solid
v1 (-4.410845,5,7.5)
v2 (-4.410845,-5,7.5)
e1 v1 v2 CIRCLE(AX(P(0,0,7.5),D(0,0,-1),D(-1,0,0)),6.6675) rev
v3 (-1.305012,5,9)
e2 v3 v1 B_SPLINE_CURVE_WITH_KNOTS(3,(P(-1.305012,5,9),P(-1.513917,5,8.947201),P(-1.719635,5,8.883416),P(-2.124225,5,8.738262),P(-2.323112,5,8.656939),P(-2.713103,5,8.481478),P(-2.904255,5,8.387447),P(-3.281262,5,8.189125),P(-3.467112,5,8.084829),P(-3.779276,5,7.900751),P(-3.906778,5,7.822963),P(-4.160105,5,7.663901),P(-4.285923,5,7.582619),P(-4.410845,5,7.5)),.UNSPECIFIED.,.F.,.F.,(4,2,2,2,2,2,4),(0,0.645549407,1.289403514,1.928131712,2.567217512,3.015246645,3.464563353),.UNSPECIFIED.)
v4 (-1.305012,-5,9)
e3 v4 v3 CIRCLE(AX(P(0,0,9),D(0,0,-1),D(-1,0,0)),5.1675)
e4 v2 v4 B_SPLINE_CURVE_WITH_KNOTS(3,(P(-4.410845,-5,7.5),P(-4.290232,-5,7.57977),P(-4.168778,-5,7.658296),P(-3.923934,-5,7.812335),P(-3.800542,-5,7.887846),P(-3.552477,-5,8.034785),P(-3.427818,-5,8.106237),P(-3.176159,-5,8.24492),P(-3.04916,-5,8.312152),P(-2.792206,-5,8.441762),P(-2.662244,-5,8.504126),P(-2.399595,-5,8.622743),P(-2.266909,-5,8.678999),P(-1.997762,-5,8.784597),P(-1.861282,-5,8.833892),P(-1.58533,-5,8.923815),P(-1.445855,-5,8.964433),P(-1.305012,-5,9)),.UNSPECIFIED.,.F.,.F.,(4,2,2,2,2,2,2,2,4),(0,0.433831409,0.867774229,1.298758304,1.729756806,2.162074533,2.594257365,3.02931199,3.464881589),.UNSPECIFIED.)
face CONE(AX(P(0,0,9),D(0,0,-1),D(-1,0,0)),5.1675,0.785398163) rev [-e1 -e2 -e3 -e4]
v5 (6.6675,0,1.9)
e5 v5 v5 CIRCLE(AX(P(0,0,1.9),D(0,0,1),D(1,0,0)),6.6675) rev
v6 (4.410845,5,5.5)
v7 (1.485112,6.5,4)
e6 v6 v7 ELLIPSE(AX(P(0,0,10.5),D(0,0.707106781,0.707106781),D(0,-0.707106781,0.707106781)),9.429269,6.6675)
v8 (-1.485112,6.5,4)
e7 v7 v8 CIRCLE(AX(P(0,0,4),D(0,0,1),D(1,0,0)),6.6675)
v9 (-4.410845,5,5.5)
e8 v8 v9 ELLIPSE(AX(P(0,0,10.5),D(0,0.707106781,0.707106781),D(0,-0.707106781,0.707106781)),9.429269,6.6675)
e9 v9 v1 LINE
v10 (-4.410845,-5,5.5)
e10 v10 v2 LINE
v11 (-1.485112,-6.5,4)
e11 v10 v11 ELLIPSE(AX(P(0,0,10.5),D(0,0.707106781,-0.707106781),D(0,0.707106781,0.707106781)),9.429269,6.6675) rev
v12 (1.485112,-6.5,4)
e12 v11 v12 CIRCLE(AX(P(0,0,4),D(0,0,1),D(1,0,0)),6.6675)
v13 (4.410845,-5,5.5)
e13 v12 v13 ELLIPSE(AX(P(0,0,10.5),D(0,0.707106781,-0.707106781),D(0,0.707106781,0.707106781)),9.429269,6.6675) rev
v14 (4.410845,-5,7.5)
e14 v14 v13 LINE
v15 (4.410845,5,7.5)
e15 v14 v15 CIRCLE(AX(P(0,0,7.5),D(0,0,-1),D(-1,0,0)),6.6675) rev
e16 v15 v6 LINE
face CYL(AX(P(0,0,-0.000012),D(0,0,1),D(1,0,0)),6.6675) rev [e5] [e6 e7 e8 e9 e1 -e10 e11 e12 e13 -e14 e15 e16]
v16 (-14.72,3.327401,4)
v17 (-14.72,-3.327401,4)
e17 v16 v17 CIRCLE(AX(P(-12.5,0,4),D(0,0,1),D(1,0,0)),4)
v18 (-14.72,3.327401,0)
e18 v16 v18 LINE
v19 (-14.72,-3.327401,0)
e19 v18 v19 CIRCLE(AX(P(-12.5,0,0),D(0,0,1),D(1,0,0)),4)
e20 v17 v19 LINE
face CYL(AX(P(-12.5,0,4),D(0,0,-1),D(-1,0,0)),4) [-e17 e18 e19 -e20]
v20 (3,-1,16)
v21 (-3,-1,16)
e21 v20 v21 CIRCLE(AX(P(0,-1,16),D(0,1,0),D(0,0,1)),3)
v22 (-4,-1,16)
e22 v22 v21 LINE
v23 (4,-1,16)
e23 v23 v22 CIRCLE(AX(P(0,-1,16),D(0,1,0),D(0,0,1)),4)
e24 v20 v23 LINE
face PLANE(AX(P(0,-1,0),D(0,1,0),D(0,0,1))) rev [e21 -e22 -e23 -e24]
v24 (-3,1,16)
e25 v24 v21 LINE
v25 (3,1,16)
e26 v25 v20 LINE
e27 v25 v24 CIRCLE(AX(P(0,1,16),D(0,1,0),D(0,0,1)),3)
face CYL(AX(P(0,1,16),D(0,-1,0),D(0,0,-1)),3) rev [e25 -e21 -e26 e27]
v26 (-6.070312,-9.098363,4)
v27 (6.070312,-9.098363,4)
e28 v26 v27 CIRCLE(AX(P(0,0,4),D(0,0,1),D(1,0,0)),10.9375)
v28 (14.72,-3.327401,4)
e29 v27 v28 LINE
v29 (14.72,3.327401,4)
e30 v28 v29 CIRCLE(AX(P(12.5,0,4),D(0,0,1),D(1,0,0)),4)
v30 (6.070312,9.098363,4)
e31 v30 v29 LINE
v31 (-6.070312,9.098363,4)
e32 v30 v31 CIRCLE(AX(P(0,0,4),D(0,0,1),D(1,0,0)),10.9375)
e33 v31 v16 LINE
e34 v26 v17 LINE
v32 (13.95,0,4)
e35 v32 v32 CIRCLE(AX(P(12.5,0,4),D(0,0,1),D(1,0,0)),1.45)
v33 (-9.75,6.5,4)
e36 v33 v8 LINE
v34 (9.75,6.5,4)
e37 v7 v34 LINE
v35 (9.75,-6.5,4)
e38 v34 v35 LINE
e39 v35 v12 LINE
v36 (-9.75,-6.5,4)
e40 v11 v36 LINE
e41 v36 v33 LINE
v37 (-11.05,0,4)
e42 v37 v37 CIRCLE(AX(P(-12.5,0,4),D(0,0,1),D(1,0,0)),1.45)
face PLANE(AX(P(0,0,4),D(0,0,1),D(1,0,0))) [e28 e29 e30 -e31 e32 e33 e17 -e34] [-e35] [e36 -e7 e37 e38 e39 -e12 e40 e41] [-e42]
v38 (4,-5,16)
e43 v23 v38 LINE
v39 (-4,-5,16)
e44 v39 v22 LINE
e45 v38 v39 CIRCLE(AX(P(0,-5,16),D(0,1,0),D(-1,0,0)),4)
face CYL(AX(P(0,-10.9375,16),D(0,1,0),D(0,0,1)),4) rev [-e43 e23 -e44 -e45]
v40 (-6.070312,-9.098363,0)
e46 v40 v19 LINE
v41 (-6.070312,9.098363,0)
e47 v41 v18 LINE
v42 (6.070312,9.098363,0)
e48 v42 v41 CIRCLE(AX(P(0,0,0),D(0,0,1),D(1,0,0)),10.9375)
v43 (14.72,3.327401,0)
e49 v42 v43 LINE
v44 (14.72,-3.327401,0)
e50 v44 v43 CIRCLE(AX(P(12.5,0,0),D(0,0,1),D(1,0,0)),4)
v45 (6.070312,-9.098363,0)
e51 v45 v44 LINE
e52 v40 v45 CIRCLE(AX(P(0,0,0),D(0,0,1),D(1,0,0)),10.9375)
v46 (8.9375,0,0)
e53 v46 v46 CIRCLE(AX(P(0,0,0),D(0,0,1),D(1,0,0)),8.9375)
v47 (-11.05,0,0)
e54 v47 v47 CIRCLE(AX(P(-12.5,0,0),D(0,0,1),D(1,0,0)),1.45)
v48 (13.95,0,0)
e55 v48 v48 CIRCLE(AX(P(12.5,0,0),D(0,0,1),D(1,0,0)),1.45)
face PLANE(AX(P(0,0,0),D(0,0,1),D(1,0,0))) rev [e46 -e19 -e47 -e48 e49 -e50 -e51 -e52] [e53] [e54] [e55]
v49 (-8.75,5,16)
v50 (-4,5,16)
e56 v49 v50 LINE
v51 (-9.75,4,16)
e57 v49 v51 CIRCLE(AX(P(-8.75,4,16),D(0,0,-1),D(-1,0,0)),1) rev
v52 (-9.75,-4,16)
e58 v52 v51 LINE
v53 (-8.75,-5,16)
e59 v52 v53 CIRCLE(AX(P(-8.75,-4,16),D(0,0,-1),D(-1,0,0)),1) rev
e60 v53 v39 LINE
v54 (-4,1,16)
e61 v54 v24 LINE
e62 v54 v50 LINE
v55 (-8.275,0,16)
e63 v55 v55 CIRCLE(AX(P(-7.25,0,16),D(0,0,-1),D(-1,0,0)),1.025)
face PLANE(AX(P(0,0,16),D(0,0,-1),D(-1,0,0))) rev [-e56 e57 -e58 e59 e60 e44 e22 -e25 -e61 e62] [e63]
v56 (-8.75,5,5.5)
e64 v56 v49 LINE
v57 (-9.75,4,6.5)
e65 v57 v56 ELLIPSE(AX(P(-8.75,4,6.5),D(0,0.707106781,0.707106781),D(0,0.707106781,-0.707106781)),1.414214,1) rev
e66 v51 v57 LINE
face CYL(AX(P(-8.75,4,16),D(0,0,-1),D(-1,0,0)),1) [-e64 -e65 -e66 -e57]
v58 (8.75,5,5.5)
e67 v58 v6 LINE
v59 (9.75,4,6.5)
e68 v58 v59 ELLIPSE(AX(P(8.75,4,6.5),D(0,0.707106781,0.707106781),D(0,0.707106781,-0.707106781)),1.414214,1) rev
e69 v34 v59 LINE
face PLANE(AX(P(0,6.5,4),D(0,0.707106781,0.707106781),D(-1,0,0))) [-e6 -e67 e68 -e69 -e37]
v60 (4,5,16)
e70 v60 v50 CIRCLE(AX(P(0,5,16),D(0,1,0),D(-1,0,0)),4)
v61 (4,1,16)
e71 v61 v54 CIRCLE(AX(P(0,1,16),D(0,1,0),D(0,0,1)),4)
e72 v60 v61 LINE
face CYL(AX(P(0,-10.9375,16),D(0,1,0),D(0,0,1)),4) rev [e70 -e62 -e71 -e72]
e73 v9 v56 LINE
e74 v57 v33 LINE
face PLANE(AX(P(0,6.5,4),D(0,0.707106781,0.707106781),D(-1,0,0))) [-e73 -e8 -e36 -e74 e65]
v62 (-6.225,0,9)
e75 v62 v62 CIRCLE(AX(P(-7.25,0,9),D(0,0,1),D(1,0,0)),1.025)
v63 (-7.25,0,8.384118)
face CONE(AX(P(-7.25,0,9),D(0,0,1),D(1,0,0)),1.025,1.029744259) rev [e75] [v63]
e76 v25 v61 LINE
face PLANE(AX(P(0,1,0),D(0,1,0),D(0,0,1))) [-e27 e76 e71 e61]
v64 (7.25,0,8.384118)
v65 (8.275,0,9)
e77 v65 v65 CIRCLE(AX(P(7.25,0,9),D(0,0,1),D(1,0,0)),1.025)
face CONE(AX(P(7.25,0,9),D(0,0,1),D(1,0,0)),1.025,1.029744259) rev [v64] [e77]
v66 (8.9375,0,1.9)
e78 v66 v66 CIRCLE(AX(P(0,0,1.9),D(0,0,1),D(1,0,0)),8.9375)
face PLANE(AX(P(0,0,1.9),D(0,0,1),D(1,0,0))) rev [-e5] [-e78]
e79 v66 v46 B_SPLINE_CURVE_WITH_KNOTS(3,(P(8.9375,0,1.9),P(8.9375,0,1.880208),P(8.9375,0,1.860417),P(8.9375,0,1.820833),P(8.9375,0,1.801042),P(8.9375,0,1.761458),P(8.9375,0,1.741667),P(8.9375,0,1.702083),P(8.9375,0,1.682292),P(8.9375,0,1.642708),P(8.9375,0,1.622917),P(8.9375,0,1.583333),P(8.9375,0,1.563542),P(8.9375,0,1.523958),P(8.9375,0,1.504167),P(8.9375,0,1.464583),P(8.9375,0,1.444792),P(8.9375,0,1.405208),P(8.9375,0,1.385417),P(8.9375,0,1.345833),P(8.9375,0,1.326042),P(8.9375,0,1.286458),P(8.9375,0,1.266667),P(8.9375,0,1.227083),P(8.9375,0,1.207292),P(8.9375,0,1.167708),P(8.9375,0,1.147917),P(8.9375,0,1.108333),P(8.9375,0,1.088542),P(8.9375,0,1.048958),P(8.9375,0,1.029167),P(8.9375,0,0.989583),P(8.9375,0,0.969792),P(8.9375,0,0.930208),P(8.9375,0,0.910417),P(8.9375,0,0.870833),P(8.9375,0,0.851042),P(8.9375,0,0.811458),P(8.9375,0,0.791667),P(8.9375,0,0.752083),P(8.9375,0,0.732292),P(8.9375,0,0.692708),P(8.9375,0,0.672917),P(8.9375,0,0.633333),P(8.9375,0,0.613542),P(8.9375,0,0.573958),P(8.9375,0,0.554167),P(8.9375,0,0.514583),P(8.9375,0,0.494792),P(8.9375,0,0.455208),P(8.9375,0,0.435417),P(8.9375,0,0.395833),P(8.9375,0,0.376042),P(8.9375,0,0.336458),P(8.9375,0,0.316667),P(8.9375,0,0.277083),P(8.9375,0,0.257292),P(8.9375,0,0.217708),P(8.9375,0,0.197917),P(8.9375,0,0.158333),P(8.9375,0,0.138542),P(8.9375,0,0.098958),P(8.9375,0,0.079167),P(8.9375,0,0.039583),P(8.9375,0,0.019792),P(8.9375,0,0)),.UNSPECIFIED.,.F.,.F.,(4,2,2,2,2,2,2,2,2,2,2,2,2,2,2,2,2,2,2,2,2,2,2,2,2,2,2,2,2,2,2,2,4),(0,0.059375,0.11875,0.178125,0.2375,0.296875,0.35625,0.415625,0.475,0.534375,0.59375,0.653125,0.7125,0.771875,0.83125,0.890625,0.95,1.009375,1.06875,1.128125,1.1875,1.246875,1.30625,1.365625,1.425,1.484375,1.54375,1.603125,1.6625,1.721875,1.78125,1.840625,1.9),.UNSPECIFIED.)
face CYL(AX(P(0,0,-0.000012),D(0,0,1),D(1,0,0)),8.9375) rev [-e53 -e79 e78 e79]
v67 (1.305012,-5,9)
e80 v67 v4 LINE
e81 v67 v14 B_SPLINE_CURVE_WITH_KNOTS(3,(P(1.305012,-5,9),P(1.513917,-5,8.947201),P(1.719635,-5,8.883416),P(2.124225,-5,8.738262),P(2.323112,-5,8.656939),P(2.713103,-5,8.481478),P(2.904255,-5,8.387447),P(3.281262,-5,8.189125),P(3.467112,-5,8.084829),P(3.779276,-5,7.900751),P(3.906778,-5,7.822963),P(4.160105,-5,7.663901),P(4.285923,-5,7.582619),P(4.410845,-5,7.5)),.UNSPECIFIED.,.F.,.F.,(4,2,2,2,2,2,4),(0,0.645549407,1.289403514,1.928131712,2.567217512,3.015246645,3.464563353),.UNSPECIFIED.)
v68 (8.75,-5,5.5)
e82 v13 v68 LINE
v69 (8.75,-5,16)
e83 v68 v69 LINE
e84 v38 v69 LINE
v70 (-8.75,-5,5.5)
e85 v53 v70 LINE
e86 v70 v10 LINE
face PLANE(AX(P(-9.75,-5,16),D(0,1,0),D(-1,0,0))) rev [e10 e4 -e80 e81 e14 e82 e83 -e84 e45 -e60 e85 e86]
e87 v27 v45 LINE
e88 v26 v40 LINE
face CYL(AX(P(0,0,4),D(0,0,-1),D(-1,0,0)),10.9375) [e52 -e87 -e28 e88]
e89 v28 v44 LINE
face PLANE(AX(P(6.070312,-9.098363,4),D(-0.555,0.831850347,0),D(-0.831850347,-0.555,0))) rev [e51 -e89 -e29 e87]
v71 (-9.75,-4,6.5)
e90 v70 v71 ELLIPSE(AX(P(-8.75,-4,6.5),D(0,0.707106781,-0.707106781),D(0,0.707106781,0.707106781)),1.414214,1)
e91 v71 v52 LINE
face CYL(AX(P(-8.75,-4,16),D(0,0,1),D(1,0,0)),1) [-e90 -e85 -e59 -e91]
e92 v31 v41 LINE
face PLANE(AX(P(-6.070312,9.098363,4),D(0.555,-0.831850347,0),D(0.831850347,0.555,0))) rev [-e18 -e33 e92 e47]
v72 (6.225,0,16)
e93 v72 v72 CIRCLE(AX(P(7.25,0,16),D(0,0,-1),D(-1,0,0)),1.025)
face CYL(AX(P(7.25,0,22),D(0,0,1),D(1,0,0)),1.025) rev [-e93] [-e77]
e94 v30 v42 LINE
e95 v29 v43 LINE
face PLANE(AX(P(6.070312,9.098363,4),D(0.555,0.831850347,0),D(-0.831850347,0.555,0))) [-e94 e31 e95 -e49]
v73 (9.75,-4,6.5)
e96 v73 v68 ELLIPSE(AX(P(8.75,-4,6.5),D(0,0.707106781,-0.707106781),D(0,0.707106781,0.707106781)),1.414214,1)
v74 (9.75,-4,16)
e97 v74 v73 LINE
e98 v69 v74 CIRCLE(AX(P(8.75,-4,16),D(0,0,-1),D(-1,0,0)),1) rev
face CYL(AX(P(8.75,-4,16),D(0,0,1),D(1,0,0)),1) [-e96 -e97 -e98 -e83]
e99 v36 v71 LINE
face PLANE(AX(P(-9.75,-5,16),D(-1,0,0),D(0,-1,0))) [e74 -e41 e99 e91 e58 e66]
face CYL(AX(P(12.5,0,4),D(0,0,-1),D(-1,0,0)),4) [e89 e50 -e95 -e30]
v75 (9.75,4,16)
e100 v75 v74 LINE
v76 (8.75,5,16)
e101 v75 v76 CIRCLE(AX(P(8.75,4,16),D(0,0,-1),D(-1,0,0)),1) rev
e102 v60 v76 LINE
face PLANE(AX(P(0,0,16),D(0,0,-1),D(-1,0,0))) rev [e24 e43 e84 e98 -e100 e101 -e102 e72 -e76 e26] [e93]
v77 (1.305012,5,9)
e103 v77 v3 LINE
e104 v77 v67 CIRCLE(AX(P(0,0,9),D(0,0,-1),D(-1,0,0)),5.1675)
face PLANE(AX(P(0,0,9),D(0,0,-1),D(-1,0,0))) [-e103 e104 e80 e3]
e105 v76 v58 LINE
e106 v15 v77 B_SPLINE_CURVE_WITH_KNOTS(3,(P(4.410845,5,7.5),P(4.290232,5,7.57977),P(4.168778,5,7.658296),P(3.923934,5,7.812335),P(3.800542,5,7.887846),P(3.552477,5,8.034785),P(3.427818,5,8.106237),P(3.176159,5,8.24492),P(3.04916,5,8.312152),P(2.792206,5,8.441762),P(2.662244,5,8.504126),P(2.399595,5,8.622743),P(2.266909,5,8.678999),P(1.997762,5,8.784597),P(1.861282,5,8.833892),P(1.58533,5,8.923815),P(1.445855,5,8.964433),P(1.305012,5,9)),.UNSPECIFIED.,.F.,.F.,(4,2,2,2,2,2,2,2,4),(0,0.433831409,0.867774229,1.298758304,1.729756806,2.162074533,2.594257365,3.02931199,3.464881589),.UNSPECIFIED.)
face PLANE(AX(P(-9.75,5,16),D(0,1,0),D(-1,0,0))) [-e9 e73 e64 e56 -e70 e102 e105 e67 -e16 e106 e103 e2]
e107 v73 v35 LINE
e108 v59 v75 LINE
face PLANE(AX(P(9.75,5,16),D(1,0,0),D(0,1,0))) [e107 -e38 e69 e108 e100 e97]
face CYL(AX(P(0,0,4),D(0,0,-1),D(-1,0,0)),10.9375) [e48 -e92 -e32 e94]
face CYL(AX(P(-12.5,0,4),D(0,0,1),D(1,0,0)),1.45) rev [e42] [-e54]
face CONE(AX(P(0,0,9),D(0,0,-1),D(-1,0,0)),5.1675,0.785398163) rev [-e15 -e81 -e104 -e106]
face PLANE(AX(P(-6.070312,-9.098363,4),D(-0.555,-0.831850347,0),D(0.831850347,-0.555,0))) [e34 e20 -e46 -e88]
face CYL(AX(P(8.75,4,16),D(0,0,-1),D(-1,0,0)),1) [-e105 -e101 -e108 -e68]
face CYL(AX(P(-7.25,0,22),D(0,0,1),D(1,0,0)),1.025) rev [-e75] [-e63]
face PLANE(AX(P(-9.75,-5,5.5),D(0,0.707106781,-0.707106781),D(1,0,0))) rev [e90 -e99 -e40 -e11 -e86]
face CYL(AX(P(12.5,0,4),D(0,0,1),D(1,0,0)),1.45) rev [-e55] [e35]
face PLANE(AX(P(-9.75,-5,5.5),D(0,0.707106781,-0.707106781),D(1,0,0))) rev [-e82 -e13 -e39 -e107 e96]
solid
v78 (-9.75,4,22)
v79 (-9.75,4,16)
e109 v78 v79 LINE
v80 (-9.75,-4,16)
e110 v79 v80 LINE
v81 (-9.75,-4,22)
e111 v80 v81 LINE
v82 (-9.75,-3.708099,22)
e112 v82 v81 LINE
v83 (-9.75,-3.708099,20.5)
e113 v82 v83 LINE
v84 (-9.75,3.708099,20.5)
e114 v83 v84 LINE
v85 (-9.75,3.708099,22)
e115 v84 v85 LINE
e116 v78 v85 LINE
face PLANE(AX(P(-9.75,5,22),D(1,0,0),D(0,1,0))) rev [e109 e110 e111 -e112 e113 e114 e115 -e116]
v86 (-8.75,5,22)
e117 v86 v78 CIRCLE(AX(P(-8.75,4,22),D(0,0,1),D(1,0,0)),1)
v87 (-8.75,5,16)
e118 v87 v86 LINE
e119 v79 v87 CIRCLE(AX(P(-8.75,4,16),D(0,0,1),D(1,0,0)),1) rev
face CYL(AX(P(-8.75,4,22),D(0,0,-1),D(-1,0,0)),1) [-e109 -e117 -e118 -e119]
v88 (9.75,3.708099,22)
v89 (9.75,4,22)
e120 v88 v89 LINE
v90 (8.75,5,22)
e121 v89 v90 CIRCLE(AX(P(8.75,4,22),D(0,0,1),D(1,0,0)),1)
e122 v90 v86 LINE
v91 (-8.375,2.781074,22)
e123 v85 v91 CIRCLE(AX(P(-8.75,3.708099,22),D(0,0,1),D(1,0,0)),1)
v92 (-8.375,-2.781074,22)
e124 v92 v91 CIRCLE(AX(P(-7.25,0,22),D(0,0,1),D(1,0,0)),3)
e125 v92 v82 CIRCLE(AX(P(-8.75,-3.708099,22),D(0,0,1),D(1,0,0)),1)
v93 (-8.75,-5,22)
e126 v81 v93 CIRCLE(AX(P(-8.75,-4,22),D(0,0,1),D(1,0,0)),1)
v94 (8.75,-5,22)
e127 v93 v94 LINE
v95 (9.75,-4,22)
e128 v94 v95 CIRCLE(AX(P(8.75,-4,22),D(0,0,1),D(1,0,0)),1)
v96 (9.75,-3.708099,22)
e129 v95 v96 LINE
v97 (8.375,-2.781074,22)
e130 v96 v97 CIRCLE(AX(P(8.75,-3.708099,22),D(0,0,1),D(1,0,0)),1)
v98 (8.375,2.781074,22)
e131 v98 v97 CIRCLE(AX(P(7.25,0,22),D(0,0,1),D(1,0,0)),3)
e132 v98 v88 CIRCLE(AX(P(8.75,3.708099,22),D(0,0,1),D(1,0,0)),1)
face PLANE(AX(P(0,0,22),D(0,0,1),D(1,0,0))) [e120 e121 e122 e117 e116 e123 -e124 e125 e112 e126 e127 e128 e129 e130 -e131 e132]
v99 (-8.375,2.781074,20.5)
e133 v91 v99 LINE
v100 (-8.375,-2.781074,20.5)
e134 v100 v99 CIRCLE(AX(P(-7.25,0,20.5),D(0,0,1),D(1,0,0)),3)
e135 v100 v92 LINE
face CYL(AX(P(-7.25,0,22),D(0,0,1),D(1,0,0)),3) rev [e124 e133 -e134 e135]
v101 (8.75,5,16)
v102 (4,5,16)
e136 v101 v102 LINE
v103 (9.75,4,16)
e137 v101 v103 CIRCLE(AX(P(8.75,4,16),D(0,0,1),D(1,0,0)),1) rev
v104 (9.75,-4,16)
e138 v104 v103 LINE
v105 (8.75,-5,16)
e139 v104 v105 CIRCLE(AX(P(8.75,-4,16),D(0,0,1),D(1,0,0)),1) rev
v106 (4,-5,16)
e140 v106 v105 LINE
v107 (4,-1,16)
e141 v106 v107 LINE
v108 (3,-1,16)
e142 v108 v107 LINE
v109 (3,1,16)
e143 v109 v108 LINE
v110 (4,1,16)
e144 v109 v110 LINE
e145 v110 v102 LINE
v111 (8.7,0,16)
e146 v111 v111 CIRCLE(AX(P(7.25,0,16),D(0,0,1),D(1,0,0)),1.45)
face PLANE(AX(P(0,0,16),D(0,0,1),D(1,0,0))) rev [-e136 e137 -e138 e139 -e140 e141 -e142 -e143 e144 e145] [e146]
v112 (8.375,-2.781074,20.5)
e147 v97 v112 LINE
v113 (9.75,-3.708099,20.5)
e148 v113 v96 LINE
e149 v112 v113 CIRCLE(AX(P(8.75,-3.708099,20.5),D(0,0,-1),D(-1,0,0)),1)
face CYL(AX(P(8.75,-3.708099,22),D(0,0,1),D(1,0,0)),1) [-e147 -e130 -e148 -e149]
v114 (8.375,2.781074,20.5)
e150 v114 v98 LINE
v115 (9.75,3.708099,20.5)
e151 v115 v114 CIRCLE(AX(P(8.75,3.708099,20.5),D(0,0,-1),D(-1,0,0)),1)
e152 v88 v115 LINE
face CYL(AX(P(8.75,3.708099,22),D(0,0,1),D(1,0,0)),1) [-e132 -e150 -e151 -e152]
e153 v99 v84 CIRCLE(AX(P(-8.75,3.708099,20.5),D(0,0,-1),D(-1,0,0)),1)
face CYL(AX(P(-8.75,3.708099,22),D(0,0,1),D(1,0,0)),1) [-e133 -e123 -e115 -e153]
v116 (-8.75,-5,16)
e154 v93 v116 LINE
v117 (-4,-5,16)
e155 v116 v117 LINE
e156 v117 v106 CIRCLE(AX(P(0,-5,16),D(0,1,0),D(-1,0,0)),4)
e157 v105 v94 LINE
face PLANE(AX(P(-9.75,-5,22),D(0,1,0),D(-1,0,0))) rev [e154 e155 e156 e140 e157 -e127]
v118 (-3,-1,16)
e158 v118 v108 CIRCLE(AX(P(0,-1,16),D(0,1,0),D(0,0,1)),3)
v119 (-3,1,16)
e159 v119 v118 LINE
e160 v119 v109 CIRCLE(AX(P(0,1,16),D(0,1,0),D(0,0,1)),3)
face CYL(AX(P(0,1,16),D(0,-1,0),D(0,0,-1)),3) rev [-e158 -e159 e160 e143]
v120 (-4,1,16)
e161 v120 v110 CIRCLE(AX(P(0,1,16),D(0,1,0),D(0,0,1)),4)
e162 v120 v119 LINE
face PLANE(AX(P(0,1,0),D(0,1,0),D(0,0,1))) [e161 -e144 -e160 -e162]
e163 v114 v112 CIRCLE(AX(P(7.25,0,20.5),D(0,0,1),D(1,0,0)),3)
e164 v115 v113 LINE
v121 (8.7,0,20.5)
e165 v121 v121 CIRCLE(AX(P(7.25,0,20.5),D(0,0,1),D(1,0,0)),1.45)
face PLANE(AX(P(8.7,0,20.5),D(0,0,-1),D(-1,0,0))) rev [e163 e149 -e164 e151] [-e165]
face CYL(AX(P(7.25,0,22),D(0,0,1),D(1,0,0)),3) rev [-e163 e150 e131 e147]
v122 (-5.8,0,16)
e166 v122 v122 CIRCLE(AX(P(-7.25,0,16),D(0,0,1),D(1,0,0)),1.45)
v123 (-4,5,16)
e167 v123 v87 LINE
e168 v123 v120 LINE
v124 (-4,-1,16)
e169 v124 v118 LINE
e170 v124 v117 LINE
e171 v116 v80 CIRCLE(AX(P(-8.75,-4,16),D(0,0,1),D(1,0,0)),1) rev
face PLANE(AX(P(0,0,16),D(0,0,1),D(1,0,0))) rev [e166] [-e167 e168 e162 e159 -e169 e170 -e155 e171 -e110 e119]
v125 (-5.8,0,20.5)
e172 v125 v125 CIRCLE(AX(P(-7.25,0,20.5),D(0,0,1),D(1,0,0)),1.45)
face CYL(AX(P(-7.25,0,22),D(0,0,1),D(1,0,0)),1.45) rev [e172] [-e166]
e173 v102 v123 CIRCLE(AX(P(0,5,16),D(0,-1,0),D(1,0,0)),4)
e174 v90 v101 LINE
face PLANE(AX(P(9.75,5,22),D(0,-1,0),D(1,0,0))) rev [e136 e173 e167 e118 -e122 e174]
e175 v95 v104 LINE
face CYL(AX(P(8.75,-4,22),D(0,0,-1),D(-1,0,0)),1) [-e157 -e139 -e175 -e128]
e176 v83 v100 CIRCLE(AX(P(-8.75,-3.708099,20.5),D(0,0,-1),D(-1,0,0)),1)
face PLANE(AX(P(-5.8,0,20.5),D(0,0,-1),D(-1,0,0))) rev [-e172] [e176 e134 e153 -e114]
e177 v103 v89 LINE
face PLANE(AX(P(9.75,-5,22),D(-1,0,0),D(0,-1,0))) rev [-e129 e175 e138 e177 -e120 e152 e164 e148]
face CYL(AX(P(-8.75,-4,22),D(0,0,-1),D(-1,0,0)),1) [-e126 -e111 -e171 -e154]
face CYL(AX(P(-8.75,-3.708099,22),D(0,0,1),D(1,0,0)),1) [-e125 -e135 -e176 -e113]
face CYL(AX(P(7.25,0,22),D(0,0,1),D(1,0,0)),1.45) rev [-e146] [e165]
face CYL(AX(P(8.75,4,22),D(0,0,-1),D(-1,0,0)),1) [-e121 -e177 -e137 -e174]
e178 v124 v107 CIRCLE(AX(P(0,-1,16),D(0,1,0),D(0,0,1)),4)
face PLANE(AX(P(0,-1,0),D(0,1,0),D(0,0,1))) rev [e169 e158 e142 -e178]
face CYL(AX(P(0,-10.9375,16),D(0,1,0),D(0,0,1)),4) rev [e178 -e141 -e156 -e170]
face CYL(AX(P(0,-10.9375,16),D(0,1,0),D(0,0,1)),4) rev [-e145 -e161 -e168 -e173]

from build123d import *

# Parameters (mm, degrees)
BOSS_EXTRUDE1_DEPTH                            = 4
CUT_EXTRUDE1_DEPTH                             = 21.196012137
CUT_EXTRUDE1_DEPTH_BACK                        = 21.196012137
CUT_EXTRUDE2_DEPTH                             = 1.9
CUT_EXTRUDE2_DEPTH_BACK                        = 21.196012137
SKETCH1_6_R                                    = 8.9375
M2_5_CLEARANCE_HOLE1_D                         = 2.9
SKETCH4_W                                      = 19.5
SKETCH4_H                                      = 10
BOSS_EXTRUDE2_DEPTH                            = 12
SKETCH6_R                                      = 6.6675
CUT_EXTRUDE3_DEPTH                             = 5
SKETCH8_W                                      = 19.5
SKETCH8_H                                      = 10
BOSS_EXTRUDE3_DEPTH                            = 6
CUT_EXTRUDE4_DEPTH                             = 30.595251414
CUT_EXTRUDE4_DEPTH_BACK                        = 30.595251414
SKETCH9_R                                      = 4
BOSS_EXTRUDE4_DEPTH                            = 1
BOSS_EXTRUDE5_DEPTH                            = 1
CHAMFER2_SIZE                                  = 1.5
TAP_DRILL_FOR_M2_5X0_45_TAP1_AT_2_COUNT        = 2
TAP_DRILL_FOR_M2_5X0_45_TAP1_AT_2_PITCH        = 14.5
CBORE_FOR_M2_5_PAN_HEAD_MACHINE_SCREW1_A_COUNT = 2
CBORE_FOR_M2_5_PAN_HEAD_MACHINE_SCREW1_A_PITCH = 14.5
FILLET1_R                                      = 1
FILLET2_R                                      = 1


with BuildPart() as part:
    # Sketch1 → Boss-Extrude1 (new body)
    with BuildSketch(Plane.XY):
        with BuildLine():
            ThreePointArc((14.72, -3.327401388), (16.5, 0), (14.72, 3.327401388))
            Line((14.72, 3.327401388), (6.0703125, 9.098363172))
            ThreePointArc((6.0703125, 9.098363172), (0, 10.9375), (-6.0703125, 9.098363172))
            Line((-6.0703125, 9.098363172), (-14.72, 3.327401388))
            ThreePointArc((-14.72, 3.327401388), (-16.5, 0), (-14.72, -3.327401388))
            Line((-14.72, -3.327401388), (-6.0703125, -9.098363172))
            ThreePointArc((-6.0703125, -9.098363172), (0, -10.9375), (6.0703125, -9.098363172))
            Line((6.0703125, -9.098363172), (14.72, -3.327401388))
        make_face()
    extrude(amount=BOSS_EXTRUDE1_DEPTH)

    # Sketch1<4> → Cut-Extrude1 (cut, two sides: drawn at the far end of the back side and taken through both)
    with BuildSketch(Plane.XY.offset(-CUT_EXTRUDE1_DEPTH_BACK)):
        with BuildLine():
            ThreePointArc((-6.6675, 0), (0, -6.6675), (6.6675, 0))
            Line((6.6675, 0), (-6.6675, 0))
        make_face()
        with BuildLine():
            Line((-6.6675, 0), (6.6675, 0))
            ThreePointArc((6.6675, 0), (0, 6.6675), (-6.6675, 0))
        make_face()
    extrude(amount=CUT_EXTRUDE1_DEPTH + CUT_EXTRUDE1_DEPTH_BACK, mode=Mode.SUBTRACT)

    # Sketch1<6> → Cut-Extrude2 (cut, two sides: drawn at the far end of the back side and taken through both)
    with BuildSketch(Plane.XY.offset(-CUT_EXTRUDE2_DEPTH_BACK)):
        Circle(SKETCH1_6_R)
    extrude(amount=CUT_EXTRUDE2_DEPTH + CUT_EXTRUDE2_DEPTH_BACK, mode=Mode.SUBTRACT)

    # M2.5 Clearance Hole1 (through all)
    with Locations(Plane.XY.offset(4)):
        with Locations((-12.5, 0), (12.5, 0)):
            Hole(M2_5_CLEARANCE_HOLE1_D / 2)

    # Sketch4 → Boss-Extrude2 (add)
    with BuildSketch(Plane.XY.offset(4)):
        Rectangle(SKETCH4_W, SKETCH4_H)
    extrude(amount=BOSS_EXTRUDE2_DEPTH)

    # Sketch6 → Cut-Extrude3 (cut)
    with BuildSketch(Plane(origin=(0, 0, 4), x_dir=(-1, 0, 0), z_dir=(0, 0, -1))):
        with Locations(Location((0, 0, 0), (0, 0, 180))):
            Circle(SKETCH6_R)
    extrude(amount=-CUT_EXTRUDE3_DEPTH, mode=Mode.SUBTRACT)


with BuildPart() as body_2:
    # Sketch8 → Boss-Extrude3 (new body)
    with BuildSketch(Plane.XY.offset(16)):
        Rectangle(SKETCH8_W, SKETCH8_H)
    extrude(amount=BOSS_EXTRUDE3_DEPTH)


with BuildPart() as cut_extrude4_tool:
    # Sketch9 → Cut-Extrude4 (new, two sides: drawn at the far end of the back side and taken through both)
    with BuildSketch(Plane(origin=(0, 0, 0), x_dir=(1, 0, 0), z_dir=(0, 1, 0)).offset(-CUT_EXTRUDE4_DEPTH_BACK)):
        with Locations((0, -16)):
            Circle(SKETCH9_R)
    extrude(amount=CUT_EXTRUDE4_DEPTH + CUT_EXTRUDE4_DEPTH_BACK)


with BuildPart() as part_1:
    add(part.part)

    # Cut-Extrude4: cut by cut_extrude4_tool
    add(cut_extrude4_tool.part, mode=Mode.SUBTRACT)

    # Sketch9<3> → Boss-Extrude4 (add, symmetric)
    with BuildSketch(Plane(origin=(0, 0, 0), x_dir=(1, 0, 0), z_dir=(0, 1, 0))):
        with BuildLine():
            ThreePointArc((-3, -16), (0, -13), (3, -16))
            Line((3, -16), (4, -16))
            ThreePointArc((4, -16), (0, -12), (-4, -16))
            Line((-4, -16), (-3, -16))
        make_face()
    extrude(amount=BOSS_EXTRUDE4_DEPTH, both=True)

    # Chamfer2
    # the kernel refuses this chamfer: 1.5 mm, written as the material it adds along each edge
    with BuildSketch(Plane(origin=(9.75, -5, 4), x_dir=(0, -0.9996219169112969, -0.027495876610586497), z_dir=(-1, 0, 0))) as chamfer2_piece_1_section:
        Polygon((CHAMFER2_SIZE * 0.999621916911, CHAMFER2_SIZE * 0.0274958766106), (-CHAMFER2_SIZE * 0.0274958766106, CHAMFER2_SIZE * 0.999621916911), (0, 0), align=None)
    chamfer2_piece_1 = extrude(amount=9.196679183, mode=Mode.PRIVATE)
    chamfer2_piece_1 = chamfer2_piece_1 - Plane(origin=(0, 0, 4.474133211), x_dir=(-1, 0, 0), z_dir=(0, 0, -1)) * Cylinder(6.6675, 25, mode=Mode.PRIVATE)
    add(chamfer2_piece_1)
    with BuildSketch(Plane(origin=(0.553320817, 5, 4), x_dir=(0, 0.9996219169112969, -0.027495876610586497), z_dir=(1, 0, 0))) as chamfer2_piece_2_section:
        Polygon((CHAMFER2_SIZE * 0.999621916911, CHAMFER2_SIZE * 0.0274958766106), (-CHAMFER2_SIZE * 0.0274958766106, CHAMFER2_SIZE * 0.999621916911), (0, 0), align=None)
    chamfer2_piece_2 = extrude(amount=9.196679183, mode=Mode.PRIVATE)
    chamfer2_piece_2 = chamfer2_piece_2 - Plane(origin=(0, 0, 4.474133218), x_dir=(-1, 0, 0), z_dir=(0, 0, -1)) * Cylinder(6.6675, 25, mode=Mode.PRIVATE)
    add(chamfer2_piece_2)
    with BuildSketch(Plane(origin=(-9.75, 5, 4), x_dir=(0, 0.9996219169112969, -0.027495876610586497), z_dir=(1, 0, 0))) as chamfer2_piece_3_section:
        Polygon((CHAMFER2_SIZE * 0.999621916911, CHAMFER2_SIZE * 0.0274958766106), (-CHAMFER2_SIZE * 0.0274958766106, CHAMFER2_SIZE * 0.999621916911), (0, 0), align=None)
    chamfer2_piece_3 = extrude(amount=9.196679183, mode=Mode.PRIVATE)
    chamfer2_piece_3 = chamfer2_piece_3 - Plane(origin=(0, 0, 4.474133211), x_dir=(-1, 0, 0), z_dir=(0, 0, -1)) * Cylinder(6.6675, 25, mode=Mode.PRIVATE)
    add(chamfer2_piece_3)
    with BuildSketch(Plane(origin=(-0.553320817, -5, 4), x_dir=(0, -0.9996219169112969, -0.027495876610586497), z_dir=(-1, 0, 0))) as chamfer2_piece_4_section:
        Polygon((CHAMFER2_SIZE * 0.999621916911, CHAMFER2_SIZE * 0.0274958766106), (-CHAMFER2_SIZE * 0.0274958766106, CHAMFER2_SIZE * 0.999621916911), (0, 0), align=None)
    chamfer2_piece_4 = extrude(amount=9.196679183, mode=Mode.PRIVATE)
    chamfer2_piece_4 = chamfer2_piece_4 - Plane(origin=(0, 0, 4.474133218), x_dir=(-1, 0, 0), z_dir=(0, 0, -1)) * Cylinder(6.6675, 25, mode=Mode.PRIVATE)
    add(chamfer2_piece_4)
    with BuildSketch(Plane(origin=(0, 0, 9), x_dir=(1, 0, 0), z_dir=(0, 1, 0))) as chamfer2_piece_5_section:
        Polygon((6.6675 - CHAMFER2_SIZE, 0), (6.6675, CHAMFER2_SIZE), (6.6675, 0), align=None)
    chamfer2_piece_5 = revolve(axis=Axis((0, 0, 9), (0, 0, -1)), revolution_arc=81.734975252, mode=Mode.PRIVATE)
    chamfer2_piece_5 = split(chamfer2_piece_5, bisect_by=Plane(origin=(5.259793087, -5, 8.512416934), z_dir=(0, 1, 0)), keep=Keep.TOP, mode=Mode.PRIVATE)
    add(chamfer2_piece_5)
    with BuildSketch(Plane(origin=(0, 0, 9), x_dir=(-0.1435510514142993, -0.9896429131953854, 0), z_dir=(0.9896429131953854, -0.1435510514142993, 0))) as chamfer2_piece_6_section:
        Polygon((6.6675 - CHAMFER2_SIZE, 0), (6.6675, CHAMFER2_SIZE), (6.6675, 0), align=None)
    chamfer2_piece_6 = revolve(axis=Axis((0, 0, 9), (0, 0, -1)), revolution_arc=163.493234438, mode=Mode.PRIVATE)
    chamfer2_piece_6 = split(chamfer2_piece_6, bisect_by=Plane(origin=(-5.93475428, 5, 8.26725428), z_dir=(0, -1, 0)), keep=Keep.TOP, mode=Mode.PRIVATE)
    chamfer2_piece_6 = split(chamfer2_piece_6, bisect_by=Plane(origin=(-5.93475428, -5, 8.26725428), z_dir=(0, 1, 0)), keep=Keep.TOP, mode=Mode.PRIVATE)
    add(chamfer2_piece_6)
    with BuildSketch(Plane(origin=(0, 0, 9), x_dir=(0.14375213464834083, 0.9896137245329842, 0), z_dir=(-0.9896137245329842, 0.14375213464834083, 0))) as chamfer2_piece_7_section:
        Polygon((6.6675, CHAMFER2_SIZE), (6.6675 - CHAMFER2_SIZE, 0), (6.6675, 0), align=None)
    chamfer2_piece_7 = revolve(axis=Axis((0, 0, 9), (0, 0, -1)), revolution_arc=81.734975252, mode=Mode.PRIVATE)
    chamfer2_piece_7 = split(chamfer2_piece_7, bisect_by=Plane(origin=(5.259793397, 5, 8.512416854), z_dir=(0, -1, 0)), keep=Keep.TOP, mode=Mode.PRIVATE)
    add(chamfer2_piece_7)

    # Sketch12 → Tap Drill for M2.5x0.45 Tap1 (revolve, cut)
    with BuildSketch(Plane(origin=(-7.25, 0, 22), x_dir=(0, -1, 0), z_dir=(1, 0, 0))):
        Polygon((0, 0), (0, 13.615882135), (1.025, 13), (1.025, 0), align=None)
    tap_drill_for_m2_5x0_45_tap1 = revolve(axis=Axis((-7.25, 0, 28.35), (0, 0, -1)), mode=Mode.SUBTRACT)

    # Tap Drill for M2.5x0.45 Tap1 at 2: Tap Drill for M2.5x0.45 Tap1 ×2
    with Locations(*[(i * TAP_DRILL_FOR_M2_5X0_45_TAP1_AT_2_PITCH, 0, 0) for i in range(1, TAP_DRILL_FOR_M2_5X0_45_TAP1_AT_2_COUNT)]):
        add(tap_drill_for_m2_5x0_45_tap1, mode=Mode.SUBTRACT)

    # Fillet1
    # the kernel refuses this fillet: 1 mm, written as the material it takes off along each edge
    with BuildSketch(Plane(origin=(-9.75, 5, 3), x_dir=(1, 0, 0), z_dir=(0, 0, 1))) as fillet1_piece_1_section:
        with BuildLine():
            CenterArc((FILLET1_R, -FILLET1_R), FILLET1_R, 90, 90)
            Line((0, -FILLET1_R), (0, 0))
            Line((0, 0), (FILLET1_R, 0))
        make_face()
    fillet1_piece_1 = extrude(amount=15.5, mode=Mode.PRIVATE)
    fillet1_piece_1 = split(fillet1_piece_1, bisect_by=Plane(origin=(-9.521455398, 1.582932532, 8.917067468), z_dir=(0, 0.7071067811868302, 0.7071067811862648)), keep=Keep.TOP, mode=Mode.PRIVATE)
    add(fillet1_piece_1, mode=Mode.SUBTRACT)
    with BuildSketch(Plane(origin=(-9.75, -5, 3), x_dir=(1, 0, 0), z_dir=(0, 0, 1))) as fillet1_piece_2_section:
        with BuildLine():
            CenterArc((FILLET1_R, FILLET1_R), FILLET1_R, 180, 90)
            Line((0, FILLET1_R), (0, 0))
            Line((0, 0), (FILLET1_R, 0))
        make_face()
    fillet1_piece_2 = extrude(amount=15.5, mode=Mode.PRIVATE)
    fillet1_piece_2 = split(fillet1_piece_2, bisect_by=Plane(origin=(-9.521455398, -1.582932532, 8.917067468), z_dir=(0, -0.7071067811868302, 0.7071067811862648)), keep=Keep.TOP, mode=Mode.PRIVATE)
    add(fillet1_piece_2, mode=Mode.SUBTRACT)
    with BuildSketch(Plane(origin=(9.75, -5, 3), x_dir=(-1, 0, 0), z_dir=(0, 0, 1))) as fillet1_piece_3_section:
        with BuildLine():
            CenterArc((FILLET1_R, -FILLET1_R), FILLET1_R, 90, 90)
            Line((0, -FILLET1_R), (0, 0))
            Line((0, 0), (FILLET1_R, 0))
        make_face()
    fillet1_piece_3 = extrude(amount=15.5, mode=Mode.PRIVATE)
    fillet1_piece_3 = split(fillet1_piece_3, bisect_by=Plane(origin=(9.521455398, -1.582932532, 8.917067468), z_dir=(0, -0.7071067811868302, 0.7071067811862648)), keep=Keep.TOP, mode=Mode.PRIVATE)
    add(fillet1_piece_3, mode=Mode.SUBTRACT)
    with BuildSketch(Plane(origin=(9.75, 5, 3), x_dir=(-1, 0, 0), z_dir=(0, 0, 1))) as fillet1_piece_4_section:
        with BuildLine():
            CenterArc((FILLET1_R, FILLET1_R), FILLET1_R, 180, 90)
            Line((0, FILLET1_R), (0, 0))
            Line((0, 0), (FILLET1_R, 0))
        make_face()
    fillet1_piece_4 = extrude(amount=15.5, mode=Mode.PRIVATE)
    fillet1_piece_4 = split(fillet1_piece_4, bisect_by=Plane(origin=(9.521455398, 1.582932532, 8.917067468), z_dir=(0, 0.7071067811868302, 0.7071067811862648)), keep=Keep.TOP, mode=Mode.PRIVATE)
    add(fillet1_piece_4, mode=Mode.SUBTRACT)


with BuildPart() as body_2_1:
    add(body_2.part)

    # Cut-Extrude4: cut by cut_extrude4_tool
    add(cut_extrude4_tool.part, mode=Mode.SUBTRACT)

    # Sketch9<4> → Boss-Extrude5 (add, symmetric)
    with BuildSketch(Plane(origin=(0, 0, 0), x_dir=(1, 0, 0), z_dir=(0, 1, 0))):
        with BuildLine():
            Line((4, -16), (3, -16))
            ThreePointArc((3, -16), (0, -19), (-3, -16))
            Line((-3, -16), (-4, -16))
            ThreePointArc((-4, -16), (0, -20), (4, -16))
        make_face()
    extrude(amount=BOSS_EXTRUDE5_DEPTH, both=True)

    # Sketch14 → CBORE for M2.5 Pan Head Machine Screw1 (revolve, cut)
    with BuildSketch(Plane(origin=(7.25, 0, 22), x_dir=(0, -1, 0), z_dir=(1, 0, 0))):
        Polygon((0, 0), (0, 22), (1.45, 22), (1.45, 1.5), (3, 1.5), (3, 0), align=None)
    cbore_for_m2_5_pan_head_machine_screw1 = revolve(axis=Axis((7.25, 0, 28.35), (0, 0, -1)), mode=Mode.SUBTRACT)

    # CBORE for M2.5 Pan Head Machine Screw1 a: CBORE for M2.5 Pan Head Machine Screw1 ×2
    with Locations(*[(-i * CBORE_FOR_M2_5_PAN_HEAD_MACHINE_SCREW1_A_PITCH, 0, 0) for i in range(1, CBORE_FOR_M2_5_PAN_HEAD_MACHINE_SCREW1_A_COUNT)]):
        add(cbore_for_m2_5_pan_head_machine_screw1, mode=Mode.SUBTRACT)

    # Fillet2
    fillet2_edges = [body_2_1.edges().sort_by_distance(p)[0] for p in [
        (-9.75, 1.658312395, 21.25),
        (-9.75, -1.658312395, 21.25),
        (9.75, -1.658312395, 21.25),
        (9.75, 1.658312395, 21.25),
        (9.75, 5, 19),
        (9.75, -5, 19),
        (-9.75, -5, 19),
        (-9.75, 5, 19),
    ]]
    fillet(fillet2_edges, radius=FILLET2_R)


solid = Compound([part_1.part, body_2_1.part])
